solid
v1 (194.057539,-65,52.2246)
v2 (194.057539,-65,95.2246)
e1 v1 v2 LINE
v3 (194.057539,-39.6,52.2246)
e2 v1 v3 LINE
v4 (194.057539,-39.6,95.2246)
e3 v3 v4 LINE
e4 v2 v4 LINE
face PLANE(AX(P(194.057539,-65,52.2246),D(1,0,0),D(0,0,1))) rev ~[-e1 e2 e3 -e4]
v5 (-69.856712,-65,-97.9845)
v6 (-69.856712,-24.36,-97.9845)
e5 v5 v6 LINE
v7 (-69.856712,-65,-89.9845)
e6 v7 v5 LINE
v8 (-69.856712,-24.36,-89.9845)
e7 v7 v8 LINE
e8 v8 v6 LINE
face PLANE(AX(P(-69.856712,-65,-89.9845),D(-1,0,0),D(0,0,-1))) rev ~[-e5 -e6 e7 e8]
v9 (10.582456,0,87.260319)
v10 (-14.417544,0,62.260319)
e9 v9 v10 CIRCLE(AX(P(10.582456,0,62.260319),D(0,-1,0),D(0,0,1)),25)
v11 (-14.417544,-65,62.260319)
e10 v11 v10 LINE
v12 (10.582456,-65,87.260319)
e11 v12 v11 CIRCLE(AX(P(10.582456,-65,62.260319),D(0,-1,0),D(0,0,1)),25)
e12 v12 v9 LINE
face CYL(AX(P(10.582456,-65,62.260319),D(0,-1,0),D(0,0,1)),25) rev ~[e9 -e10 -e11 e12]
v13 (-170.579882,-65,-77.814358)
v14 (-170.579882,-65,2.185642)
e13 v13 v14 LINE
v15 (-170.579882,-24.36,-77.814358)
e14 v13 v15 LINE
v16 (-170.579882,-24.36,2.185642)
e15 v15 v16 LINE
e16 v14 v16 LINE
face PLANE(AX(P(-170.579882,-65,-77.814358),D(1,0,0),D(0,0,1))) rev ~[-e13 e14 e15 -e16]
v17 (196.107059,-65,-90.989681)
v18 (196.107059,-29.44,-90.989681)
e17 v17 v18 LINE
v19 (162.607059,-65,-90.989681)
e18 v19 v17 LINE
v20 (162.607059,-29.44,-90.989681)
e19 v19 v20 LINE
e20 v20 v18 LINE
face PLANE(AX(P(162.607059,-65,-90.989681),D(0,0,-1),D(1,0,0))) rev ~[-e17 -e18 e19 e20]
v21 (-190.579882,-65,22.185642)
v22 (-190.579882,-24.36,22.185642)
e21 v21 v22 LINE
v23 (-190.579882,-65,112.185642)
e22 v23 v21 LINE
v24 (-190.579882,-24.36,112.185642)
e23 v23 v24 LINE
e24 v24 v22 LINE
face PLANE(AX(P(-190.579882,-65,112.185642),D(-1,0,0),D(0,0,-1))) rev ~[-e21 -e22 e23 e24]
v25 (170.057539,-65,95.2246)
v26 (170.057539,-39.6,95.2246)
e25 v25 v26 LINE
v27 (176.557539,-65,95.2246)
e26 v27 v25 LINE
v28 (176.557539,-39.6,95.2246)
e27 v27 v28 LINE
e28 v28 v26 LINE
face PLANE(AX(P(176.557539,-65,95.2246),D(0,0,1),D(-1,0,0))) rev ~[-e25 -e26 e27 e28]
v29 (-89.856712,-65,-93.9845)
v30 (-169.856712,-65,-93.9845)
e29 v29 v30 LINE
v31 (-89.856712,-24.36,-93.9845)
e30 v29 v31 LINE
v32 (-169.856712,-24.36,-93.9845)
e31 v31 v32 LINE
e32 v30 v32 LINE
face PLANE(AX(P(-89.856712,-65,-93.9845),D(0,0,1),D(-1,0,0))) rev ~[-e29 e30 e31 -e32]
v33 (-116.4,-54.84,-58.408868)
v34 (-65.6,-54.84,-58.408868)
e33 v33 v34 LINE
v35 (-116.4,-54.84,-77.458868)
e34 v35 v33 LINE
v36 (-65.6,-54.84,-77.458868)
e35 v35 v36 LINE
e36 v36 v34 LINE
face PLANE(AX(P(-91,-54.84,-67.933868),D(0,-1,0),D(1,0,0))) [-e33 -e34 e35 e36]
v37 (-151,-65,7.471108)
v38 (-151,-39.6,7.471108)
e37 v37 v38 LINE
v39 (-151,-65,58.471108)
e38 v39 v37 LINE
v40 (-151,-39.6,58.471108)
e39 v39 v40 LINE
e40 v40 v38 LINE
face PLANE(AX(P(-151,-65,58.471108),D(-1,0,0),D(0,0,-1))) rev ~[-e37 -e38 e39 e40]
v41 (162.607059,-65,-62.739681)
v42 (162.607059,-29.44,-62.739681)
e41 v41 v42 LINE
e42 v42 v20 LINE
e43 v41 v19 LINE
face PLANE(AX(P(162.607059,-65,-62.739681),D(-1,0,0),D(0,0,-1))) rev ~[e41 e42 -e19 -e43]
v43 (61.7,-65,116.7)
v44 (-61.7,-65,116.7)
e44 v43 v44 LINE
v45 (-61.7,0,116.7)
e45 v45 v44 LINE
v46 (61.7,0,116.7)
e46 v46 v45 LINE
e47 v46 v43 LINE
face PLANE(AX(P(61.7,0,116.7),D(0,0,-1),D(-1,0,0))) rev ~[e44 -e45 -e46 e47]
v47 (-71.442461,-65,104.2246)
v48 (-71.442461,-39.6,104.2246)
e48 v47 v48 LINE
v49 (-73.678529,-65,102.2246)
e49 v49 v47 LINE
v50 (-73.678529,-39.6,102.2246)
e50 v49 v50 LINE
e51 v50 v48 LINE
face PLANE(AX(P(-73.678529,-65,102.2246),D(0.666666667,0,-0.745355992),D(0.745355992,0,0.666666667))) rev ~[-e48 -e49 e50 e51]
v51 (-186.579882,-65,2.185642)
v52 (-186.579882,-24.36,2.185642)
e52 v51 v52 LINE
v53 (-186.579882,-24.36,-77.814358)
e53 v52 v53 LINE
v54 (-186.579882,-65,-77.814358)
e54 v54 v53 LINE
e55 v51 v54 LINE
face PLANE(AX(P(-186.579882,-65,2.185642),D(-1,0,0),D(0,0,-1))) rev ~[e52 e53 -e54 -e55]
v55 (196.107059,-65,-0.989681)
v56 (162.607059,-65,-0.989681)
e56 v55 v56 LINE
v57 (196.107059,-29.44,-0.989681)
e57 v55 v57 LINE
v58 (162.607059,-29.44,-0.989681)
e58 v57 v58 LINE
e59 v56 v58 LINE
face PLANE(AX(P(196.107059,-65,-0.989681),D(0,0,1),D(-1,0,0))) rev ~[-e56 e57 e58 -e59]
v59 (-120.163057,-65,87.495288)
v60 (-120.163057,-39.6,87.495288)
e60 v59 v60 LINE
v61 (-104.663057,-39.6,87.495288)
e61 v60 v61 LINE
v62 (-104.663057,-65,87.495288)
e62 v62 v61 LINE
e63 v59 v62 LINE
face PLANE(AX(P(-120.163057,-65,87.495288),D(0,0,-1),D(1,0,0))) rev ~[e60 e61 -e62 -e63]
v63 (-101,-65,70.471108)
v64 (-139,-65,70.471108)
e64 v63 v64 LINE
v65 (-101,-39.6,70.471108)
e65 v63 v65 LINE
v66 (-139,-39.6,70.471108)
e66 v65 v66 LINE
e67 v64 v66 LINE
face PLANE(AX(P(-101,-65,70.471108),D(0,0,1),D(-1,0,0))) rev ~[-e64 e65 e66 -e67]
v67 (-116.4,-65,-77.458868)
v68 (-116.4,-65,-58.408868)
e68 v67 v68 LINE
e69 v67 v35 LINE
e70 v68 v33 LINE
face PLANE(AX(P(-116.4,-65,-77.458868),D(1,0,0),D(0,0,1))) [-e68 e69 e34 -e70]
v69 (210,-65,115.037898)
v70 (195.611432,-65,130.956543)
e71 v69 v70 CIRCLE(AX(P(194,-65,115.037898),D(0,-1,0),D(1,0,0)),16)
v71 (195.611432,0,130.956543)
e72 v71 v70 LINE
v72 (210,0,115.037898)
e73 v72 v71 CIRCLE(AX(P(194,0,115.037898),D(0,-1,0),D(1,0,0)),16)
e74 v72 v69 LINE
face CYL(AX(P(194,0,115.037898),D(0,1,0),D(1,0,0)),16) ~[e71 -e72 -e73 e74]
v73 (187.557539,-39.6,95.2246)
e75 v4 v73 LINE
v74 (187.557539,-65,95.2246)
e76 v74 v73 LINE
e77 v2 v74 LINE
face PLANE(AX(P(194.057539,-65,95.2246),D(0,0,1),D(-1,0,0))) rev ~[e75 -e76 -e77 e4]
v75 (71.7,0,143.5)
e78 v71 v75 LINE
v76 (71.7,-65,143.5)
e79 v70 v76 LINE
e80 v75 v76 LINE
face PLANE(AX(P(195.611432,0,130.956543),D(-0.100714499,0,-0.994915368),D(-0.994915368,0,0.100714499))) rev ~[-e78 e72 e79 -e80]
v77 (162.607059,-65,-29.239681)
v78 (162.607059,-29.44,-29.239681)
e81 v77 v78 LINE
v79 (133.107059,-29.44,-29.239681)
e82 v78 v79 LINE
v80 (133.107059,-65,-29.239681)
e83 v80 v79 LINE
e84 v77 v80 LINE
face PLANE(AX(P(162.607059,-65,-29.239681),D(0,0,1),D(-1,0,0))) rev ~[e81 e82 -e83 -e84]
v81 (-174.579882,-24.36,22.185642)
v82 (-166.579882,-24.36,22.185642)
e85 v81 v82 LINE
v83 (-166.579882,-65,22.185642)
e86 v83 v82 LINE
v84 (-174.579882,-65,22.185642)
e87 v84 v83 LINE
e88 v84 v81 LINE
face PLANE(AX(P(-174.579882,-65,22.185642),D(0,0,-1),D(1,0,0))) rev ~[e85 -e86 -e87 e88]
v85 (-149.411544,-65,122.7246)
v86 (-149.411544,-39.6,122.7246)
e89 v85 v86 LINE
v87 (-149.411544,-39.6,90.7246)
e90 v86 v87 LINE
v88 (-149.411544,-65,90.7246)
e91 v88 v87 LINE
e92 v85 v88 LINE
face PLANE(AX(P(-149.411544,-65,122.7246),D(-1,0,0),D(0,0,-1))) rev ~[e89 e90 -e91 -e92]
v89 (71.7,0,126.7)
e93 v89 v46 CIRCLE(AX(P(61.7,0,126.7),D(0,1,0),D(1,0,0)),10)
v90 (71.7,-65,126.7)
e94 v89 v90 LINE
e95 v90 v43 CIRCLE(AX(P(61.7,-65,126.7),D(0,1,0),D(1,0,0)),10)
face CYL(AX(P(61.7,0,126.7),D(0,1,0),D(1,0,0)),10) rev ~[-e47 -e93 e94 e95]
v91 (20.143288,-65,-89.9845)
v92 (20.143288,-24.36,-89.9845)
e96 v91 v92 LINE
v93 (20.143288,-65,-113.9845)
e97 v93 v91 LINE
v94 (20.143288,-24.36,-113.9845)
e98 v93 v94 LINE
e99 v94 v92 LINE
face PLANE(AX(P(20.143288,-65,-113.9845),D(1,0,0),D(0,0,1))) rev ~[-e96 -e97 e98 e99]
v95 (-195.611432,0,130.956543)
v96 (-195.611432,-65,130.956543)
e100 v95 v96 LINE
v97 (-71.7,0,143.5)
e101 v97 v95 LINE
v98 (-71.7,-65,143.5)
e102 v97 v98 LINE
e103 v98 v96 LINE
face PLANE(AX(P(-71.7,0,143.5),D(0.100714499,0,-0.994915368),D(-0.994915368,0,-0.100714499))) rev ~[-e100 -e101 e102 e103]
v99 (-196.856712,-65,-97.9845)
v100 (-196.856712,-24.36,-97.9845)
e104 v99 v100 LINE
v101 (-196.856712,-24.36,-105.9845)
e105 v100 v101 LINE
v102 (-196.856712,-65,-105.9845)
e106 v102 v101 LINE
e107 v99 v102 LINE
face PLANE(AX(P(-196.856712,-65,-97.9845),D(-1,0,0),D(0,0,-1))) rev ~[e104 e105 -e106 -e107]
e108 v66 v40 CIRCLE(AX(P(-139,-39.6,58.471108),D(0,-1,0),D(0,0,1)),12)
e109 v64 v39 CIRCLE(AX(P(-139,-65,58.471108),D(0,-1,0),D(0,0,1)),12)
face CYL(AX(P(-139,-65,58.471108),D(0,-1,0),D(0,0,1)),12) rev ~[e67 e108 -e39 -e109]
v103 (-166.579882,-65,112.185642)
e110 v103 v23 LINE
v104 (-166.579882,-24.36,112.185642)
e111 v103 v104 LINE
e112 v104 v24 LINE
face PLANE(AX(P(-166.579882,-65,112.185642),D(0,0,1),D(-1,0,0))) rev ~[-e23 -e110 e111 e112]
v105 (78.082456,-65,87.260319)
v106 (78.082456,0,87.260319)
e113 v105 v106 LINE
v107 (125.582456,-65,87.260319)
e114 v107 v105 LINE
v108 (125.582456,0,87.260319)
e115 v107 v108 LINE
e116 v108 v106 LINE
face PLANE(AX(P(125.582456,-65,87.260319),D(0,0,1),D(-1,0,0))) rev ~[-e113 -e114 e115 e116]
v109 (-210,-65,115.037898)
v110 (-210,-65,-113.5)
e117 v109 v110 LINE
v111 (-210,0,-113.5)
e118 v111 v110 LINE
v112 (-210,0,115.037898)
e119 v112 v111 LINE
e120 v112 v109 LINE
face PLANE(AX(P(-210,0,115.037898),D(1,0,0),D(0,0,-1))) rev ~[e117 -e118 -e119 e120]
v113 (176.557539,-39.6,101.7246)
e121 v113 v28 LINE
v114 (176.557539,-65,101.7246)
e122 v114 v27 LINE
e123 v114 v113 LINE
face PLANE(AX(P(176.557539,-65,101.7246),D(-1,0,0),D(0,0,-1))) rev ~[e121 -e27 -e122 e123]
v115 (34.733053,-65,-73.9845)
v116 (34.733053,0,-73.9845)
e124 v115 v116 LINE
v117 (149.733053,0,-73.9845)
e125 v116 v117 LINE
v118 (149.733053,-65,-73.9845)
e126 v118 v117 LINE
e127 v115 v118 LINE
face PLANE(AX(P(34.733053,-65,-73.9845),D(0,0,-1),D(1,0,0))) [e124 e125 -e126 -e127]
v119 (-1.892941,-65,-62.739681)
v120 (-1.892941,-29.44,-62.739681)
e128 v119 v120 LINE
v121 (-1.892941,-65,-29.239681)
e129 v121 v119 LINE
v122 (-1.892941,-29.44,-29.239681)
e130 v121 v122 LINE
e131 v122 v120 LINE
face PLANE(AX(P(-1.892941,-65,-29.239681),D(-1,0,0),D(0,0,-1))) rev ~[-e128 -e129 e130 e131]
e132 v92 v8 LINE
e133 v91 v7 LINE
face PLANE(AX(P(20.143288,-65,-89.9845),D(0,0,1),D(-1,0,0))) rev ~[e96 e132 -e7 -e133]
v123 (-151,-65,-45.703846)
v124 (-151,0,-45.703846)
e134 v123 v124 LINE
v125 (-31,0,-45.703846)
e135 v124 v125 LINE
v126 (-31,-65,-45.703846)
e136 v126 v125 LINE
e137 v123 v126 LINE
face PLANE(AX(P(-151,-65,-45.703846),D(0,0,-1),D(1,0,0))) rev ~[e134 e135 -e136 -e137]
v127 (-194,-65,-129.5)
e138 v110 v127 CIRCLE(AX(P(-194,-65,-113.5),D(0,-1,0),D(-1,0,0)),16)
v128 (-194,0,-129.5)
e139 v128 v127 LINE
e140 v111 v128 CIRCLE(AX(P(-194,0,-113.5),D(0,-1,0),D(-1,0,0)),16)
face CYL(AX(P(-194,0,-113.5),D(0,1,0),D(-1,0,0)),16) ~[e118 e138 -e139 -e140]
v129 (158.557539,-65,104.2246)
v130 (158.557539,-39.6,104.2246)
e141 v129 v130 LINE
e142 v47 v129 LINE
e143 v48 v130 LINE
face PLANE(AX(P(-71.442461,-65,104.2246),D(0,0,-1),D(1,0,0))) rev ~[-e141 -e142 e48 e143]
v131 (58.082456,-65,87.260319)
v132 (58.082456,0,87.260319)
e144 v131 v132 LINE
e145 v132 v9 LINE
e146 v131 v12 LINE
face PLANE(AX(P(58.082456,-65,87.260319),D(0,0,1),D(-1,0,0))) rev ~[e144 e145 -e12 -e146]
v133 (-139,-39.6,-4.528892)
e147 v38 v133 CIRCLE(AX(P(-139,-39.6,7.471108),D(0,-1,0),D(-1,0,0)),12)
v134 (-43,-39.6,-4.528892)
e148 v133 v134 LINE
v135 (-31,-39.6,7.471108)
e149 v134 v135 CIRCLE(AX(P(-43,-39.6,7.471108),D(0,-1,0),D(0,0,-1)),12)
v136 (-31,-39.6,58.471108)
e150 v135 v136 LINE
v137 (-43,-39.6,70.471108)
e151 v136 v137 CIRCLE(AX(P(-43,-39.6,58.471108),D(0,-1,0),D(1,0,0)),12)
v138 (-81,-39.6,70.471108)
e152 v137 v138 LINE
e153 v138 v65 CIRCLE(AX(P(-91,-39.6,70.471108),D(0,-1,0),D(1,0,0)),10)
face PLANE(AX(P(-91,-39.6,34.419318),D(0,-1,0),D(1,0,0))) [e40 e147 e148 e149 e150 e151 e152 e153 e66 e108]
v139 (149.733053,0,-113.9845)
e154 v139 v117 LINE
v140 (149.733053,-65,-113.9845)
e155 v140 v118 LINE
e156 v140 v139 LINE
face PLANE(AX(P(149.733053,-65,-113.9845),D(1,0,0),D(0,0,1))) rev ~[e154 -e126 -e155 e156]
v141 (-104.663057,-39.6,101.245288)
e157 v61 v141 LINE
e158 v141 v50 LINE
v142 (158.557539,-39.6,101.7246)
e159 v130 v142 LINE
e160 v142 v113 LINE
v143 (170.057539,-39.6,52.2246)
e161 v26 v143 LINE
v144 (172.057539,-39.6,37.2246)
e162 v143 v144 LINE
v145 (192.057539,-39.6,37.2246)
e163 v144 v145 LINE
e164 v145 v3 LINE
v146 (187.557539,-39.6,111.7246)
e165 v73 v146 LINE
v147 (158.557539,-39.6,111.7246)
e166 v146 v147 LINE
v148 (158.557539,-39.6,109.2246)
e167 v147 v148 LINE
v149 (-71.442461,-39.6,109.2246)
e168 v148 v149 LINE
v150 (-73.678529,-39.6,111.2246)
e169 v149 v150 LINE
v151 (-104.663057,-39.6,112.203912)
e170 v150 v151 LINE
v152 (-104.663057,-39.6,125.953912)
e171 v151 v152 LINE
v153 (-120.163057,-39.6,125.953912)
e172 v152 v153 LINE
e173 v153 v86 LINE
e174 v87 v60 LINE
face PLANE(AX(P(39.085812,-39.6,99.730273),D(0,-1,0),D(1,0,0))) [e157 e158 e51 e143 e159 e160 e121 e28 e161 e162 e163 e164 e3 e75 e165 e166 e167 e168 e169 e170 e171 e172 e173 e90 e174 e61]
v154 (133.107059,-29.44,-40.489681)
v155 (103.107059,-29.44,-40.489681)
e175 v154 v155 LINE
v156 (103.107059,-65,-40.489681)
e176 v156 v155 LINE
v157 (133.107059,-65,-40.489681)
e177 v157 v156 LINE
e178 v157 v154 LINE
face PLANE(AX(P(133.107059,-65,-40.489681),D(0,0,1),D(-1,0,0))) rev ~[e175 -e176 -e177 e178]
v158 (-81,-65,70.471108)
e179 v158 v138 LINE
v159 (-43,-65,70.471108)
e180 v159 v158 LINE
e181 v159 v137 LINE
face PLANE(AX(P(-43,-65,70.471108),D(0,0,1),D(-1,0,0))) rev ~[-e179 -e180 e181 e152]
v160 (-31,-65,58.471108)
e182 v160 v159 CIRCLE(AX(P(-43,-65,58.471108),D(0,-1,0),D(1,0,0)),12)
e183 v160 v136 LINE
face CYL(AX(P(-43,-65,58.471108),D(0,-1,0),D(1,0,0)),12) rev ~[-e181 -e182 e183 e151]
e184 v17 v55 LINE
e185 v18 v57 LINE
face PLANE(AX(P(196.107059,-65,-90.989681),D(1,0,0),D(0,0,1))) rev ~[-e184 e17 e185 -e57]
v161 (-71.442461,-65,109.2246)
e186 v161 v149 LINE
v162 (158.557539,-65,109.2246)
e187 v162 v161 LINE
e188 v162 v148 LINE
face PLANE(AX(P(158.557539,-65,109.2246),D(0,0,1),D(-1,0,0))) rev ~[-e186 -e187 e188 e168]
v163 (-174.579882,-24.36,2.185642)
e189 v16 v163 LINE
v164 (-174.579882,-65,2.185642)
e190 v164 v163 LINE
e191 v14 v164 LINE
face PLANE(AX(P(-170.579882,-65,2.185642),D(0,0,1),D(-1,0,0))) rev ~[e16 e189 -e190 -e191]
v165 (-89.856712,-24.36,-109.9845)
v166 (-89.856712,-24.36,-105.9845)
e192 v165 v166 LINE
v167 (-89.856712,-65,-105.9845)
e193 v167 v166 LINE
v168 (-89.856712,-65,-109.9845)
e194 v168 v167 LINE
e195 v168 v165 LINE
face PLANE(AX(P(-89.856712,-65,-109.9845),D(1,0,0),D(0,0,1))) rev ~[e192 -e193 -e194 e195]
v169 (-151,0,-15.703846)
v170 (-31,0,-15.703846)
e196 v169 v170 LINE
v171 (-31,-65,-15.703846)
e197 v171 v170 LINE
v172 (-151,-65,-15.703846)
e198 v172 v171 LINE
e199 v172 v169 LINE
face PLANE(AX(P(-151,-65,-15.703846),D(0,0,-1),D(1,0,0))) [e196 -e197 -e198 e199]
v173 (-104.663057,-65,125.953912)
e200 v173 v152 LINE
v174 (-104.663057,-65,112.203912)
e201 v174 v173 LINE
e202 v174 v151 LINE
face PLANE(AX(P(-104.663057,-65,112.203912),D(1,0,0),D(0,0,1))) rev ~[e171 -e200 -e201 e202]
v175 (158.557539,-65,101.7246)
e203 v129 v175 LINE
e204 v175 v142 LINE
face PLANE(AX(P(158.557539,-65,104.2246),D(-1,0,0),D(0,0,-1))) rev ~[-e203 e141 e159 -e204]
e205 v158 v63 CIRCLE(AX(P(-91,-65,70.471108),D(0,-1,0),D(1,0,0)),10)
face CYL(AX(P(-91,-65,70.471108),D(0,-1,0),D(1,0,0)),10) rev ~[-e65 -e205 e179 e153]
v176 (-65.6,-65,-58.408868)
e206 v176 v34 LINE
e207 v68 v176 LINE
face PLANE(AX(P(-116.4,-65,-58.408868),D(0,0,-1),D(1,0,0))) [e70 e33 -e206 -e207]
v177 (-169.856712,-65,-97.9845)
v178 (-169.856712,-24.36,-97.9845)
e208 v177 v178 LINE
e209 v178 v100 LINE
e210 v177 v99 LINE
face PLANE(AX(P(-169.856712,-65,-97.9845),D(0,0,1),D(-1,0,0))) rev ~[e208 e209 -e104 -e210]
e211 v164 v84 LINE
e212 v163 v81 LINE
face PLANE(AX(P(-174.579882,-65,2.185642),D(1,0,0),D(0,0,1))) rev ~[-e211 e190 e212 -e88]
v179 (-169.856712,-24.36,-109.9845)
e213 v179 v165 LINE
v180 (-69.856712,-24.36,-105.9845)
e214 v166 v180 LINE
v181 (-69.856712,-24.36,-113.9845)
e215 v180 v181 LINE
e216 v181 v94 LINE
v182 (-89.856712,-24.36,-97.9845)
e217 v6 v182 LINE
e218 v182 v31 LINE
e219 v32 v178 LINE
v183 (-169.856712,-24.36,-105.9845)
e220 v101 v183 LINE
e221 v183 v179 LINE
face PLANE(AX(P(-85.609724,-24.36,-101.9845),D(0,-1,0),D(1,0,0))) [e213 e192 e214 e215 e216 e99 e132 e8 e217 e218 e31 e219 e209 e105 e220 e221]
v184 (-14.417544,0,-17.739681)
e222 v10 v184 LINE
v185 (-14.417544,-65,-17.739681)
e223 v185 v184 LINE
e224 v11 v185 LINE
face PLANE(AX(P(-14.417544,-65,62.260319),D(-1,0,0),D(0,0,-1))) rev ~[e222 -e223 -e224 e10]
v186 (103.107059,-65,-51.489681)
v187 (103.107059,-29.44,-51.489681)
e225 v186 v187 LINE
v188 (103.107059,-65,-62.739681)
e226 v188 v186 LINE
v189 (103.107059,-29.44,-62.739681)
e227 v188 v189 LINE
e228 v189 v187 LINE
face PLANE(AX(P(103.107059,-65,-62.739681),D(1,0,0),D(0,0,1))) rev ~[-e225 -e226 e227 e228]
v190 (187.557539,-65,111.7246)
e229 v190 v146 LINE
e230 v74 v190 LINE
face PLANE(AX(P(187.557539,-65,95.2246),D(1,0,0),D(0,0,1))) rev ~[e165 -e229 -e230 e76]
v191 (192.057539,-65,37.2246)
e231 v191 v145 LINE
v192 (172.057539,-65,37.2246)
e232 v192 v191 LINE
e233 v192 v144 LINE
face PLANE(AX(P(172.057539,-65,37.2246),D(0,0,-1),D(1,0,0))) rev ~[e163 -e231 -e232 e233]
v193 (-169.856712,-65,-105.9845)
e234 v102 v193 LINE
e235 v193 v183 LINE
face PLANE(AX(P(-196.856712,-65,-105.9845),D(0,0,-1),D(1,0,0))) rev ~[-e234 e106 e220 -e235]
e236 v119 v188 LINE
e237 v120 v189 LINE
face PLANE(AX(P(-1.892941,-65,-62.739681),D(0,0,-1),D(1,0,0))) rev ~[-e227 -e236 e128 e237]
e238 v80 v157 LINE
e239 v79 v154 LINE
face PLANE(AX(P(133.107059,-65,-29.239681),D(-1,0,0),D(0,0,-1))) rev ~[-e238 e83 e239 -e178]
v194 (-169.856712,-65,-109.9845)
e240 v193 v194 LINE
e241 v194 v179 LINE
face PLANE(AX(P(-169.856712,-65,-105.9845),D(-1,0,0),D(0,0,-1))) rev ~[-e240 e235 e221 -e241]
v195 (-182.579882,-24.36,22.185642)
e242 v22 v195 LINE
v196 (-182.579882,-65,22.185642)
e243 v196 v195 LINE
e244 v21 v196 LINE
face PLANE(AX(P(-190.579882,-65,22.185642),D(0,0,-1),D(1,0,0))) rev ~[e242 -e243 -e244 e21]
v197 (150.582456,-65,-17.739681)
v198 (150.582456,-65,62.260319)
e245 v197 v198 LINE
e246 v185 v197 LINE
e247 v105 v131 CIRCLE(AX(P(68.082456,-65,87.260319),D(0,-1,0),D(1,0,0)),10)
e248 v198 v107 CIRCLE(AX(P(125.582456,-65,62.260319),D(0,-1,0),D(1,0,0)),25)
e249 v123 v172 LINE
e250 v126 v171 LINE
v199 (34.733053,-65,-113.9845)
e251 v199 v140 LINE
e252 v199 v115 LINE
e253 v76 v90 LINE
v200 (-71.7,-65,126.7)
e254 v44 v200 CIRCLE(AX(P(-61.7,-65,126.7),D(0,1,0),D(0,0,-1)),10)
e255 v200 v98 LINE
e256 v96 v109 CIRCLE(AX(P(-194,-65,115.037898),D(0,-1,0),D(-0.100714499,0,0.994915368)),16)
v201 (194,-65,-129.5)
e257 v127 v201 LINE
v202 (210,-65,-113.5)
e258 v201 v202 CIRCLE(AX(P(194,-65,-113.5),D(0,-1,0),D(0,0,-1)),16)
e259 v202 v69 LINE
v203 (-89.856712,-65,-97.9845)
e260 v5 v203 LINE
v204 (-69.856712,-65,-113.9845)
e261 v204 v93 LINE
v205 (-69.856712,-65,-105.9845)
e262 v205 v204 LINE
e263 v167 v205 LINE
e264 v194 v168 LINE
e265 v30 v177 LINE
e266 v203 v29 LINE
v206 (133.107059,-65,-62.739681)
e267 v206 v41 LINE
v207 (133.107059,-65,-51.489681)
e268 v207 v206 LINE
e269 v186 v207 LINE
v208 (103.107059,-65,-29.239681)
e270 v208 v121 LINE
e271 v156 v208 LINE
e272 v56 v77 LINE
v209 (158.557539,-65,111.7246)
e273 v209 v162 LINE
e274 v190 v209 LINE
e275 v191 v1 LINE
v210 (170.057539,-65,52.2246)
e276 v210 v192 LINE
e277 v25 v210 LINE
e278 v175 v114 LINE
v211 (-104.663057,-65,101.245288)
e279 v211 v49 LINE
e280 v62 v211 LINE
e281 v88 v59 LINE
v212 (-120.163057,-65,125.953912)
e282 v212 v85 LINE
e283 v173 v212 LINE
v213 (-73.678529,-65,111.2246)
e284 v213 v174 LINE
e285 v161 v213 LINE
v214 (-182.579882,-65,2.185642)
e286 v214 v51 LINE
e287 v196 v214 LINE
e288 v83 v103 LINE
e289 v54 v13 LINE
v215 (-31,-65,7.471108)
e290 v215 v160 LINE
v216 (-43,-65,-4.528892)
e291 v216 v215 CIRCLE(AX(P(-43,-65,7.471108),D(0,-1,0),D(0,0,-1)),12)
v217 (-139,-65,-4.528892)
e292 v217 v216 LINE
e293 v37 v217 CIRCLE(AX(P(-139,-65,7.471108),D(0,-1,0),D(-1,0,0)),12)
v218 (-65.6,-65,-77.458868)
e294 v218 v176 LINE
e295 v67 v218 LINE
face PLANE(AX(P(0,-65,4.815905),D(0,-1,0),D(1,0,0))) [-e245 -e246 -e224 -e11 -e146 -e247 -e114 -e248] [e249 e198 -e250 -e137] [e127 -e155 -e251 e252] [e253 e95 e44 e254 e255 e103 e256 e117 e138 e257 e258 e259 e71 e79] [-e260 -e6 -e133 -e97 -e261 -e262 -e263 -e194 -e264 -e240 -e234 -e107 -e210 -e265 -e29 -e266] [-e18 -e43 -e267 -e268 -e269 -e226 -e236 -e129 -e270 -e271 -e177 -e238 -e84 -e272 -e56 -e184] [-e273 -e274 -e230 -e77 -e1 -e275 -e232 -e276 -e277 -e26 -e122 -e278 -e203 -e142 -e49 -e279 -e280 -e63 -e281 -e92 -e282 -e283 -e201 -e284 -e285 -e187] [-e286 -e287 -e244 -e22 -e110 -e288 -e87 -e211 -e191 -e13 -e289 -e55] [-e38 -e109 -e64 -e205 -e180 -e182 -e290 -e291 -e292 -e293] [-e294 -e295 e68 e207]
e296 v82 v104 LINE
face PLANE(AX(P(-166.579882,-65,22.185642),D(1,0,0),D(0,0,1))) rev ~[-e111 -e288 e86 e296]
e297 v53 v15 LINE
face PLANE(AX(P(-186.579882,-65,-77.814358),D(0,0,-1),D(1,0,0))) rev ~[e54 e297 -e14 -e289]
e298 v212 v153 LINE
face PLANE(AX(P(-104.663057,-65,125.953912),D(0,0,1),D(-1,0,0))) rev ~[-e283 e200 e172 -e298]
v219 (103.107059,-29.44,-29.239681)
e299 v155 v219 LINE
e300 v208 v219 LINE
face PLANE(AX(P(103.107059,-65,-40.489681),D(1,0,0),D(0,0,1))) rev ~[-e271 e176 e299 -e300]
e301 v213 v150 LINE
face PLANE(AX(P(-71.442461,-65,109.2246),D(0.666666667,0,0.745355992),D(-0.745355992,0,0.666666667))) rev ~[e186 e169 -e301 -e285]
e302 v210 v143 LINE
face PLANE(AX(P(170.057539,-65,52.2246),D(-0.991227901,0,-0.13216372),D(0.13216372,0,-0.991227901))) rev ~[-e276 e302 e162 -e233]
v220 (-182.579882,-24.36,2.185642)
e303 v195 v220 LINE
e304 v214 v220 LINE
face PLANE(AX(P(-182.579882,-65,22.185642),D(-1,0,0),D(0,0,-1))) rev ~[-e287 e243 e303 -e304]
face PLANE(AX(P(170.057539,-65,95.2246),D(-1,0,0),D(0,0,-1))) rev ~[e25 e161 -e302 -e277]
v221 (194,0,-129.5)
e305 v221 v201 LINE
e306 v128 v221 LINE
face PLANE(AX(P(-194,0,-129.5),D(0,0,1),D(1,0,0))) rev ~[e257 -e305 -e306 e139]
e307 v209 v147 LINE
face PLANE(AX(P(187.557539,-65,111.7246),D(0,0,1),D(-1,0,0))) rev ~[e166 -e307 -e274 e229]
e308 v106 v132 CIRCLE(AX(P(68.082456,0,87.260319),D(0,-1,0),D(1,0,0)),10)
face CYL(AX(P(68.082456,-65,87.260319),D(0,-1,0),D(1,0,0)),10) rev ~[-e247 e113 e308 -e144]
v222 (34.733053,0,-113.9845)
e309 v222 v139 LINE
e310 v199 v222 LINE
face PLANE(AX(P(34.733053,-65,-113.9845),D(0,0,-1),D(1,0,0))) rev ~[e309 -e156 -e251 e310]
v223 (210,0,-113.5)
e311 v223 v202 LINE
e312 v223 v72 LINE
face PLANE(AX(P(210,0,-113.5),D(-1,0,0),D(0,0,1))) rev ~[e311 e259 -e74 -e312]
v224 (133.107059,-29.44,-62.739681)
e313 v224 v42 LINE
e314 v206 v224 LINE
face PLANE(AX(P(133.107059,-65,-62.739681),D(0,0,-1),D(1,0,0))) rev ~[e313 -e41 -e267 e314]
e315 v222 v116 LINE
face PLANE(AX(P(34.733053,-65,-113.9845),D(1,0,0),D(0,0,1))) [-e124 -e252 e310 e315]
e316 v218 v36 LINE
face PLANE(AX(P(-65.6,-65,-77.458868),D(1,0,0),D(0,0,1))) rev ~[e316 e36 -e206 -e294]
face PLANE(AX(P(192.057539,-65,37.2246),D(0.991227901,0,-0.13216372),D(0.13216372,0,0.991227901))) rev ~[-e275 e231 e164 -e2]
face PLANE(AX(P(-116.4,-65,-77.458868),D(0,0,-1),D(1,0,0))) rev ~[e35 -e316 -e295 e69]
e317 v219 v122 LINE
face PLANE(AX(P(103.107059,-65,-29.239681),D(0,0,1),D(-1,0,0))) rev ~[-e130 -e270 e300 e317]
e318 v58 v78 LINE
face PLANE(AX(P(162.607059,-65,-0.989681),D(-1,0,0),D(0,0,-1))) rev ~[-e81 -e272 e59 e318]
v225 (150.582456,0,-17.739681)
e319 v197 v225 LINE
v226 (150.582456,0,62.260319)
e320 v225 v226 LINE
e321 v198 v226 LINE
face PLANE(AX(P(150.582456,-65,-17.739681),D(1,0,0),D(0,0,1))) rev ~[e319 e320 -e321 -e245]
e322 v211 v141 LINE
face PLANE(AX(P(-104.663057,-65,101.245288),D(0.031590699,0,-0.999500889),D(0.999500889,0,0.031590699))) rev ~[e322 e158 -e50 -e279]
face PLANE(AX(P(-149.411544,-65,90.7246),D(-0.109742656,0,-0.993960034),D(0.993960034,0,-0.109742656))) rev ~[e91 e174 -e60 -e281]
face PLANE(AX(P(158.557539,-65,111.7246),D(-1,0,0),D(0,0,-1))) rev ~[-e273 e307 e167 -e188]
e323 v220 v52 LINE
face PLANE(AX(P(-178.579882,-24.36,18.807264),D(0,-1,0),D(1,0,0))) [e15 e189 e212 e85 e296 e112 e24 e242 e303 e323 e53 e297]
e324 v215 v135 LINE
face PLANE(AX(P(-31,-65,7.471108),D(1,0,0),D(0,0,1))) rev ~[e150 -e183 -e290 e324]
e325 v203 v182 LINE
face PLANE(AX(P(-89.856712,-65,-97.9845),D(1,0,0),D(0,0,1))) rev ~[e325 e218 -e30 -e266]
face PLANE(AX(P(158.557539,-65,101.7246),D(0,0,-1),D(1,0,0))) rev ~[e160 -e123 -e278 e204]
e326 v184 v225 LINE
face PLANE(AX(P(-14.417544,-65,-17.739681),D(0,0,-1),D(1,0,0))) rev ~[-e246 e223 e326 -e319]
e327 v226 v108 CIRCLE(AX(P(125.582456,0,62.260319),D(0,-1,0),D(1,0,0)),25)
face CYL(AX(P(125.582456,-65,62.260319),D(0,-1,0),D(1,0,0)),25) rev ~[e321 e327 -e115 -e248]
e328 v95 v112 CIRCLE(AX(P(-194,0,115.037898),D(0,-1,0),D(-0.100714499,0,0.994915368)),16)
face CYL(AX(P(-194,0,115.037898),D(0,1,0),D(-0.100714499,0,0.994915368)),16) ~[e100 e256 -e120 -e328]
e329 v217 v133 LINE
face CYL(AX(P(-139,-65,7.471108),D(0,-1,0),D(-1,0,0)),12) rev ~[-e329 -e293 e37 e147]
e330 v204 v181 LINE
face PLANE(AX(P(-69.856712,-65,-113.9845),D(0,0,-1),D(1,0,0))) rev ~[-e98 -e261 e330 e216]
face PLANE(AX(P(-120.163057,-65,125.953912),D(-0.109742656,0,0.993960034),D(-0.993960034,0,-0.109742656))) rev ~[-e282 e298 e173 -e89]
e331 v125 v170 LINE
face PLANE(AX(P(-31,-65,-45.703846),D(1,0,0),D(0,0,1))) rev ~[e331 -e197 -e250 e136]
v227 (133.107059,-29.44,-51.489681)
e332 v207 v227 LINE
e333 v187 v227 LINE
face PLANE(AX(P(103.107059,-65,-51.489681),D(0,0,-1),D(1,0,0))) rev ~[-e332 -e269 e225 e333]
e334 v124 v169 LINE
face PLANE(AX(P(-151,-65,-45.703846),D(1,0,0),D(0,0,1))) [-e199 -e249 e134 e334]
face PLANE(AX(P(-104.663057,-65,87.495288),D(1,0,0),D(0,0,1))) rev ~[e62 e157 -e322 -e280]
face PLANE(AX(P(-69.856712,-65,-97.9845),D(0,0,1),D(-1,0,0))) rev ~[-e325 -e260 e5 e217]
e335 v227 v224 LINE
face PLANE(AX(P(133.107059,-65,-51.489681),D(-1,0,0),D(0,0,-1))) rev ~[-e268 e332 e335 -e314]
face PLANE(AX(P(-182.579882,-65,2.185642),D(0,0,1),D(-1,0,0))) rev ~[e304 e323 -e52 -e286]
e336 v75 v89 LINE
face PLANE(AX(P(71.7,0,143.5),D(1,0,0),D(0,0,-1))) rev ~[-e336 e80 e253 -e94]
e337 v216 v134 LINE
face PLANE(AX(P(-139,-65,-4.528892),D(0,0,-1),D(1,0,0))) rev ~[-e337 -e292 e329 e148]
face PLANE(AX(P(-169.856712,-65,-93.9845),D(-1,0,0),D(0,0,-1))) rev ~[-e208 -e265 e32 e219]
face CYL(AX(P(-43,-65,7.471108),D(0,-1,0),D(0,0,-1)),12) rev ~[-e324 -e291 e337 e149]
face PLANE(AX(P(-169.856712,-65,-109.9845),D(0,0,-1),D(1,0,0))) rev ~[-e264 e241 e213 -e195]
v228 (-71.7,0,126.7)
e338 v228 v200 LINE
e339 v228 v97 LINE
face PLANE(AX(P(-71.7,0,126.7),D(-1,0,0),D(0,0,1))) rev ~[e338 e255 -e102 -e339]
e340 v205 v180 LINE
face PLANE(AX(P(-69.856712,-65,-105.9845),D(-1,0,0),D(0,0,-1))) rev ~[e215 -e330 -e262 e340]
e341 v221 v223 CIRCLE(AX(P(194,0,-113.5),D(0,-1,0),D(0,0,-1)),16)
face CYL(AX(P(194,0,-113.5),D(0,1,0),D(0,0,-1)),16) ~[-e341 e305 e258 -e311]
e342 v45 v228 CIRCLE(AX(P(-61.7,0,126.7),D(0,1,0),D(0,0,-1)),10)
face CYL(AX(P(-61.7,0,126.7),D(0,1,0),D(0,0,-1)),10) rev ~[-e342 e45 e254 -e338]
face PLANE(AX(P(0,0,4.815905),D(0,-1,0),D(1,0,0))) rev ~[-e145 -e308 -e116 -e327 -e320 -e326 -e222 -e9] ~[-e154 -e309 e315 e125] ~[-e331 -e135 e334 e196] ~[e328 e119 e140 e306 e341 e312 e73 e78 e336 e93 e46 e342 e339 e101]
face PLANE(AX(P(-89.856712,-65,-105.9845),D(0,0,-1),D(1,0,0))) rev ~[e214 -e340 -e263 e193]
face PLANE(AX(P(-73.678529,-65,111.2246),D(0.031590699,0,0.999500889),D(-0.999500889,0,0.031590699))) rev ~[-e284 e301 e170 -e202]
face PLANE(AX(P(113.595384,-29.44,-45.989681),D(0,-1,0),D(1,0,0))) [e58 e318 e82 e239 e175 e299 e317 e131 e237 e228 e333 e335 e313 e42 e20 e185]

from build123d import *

# Parameters (mm, degrees)
F1_DEPTH  = 65
F11_DEPTH = 65.001
F12_DEPTH = 25.4
F13_DEPTH = 35.56
F9_W      = 120
F9_H      = 30
F8_W      = 115
F8_H      = 40
F14_DEPTH = 65.001
F15_DEPTH = 25.4
F16_DEPTH = 40.64
F10_W     = 50.8
F10_H     = 19.05
F17_DEPTH = 10.16


# Not quite as in the source:
# - a length typed as a fraction of an inch, garbled in the dataset ("3 / 203.2 mm" for 3/8 in), is restored


with BuildPart() as f1:
    # F0 (on Front) → F1 (new body)
    with BuildSketch(Plane.XZ):
        with BuildLine():
            Line((-194, -129.5), (0, -129.5))
            Line((0, -129.5), (194, -129.5))
            ThreePointArc((194, -129.5), (205.313708499, -124.813708499), (210, -113.5))
            Line((210, -113.5), (210, 115.0378975104))
            ThreePointArc((210, 115.0378975104), (205.8697706725, 125.76676251), (195.6114319773, 130.9565434007))
            Line((195.6114319773, 130.9565434007), (71.7, 143.5))
            Line((71.7, 143.5), (71.7, 126.7))
            ThreePointArc((71.7, 126.7), (68.7710678119, 119.6289321881), (61.7, 116.7))
            Line((61.7, 116.7), (0, 116.7))
            Line((0, 116.7), (-61.7, 116.7))
            ThreePointArc((-61.7, 116.7), (-68.7710678119, 119.6289321881), (-71.7, 126.7))
            Line((-71.7, 126.7), (-71.7, 143.5))
            Line((-71.7, 143.5), (-195.6114319773, 130.9565434007))
            ThreePointArc((-195.6114319773, 130.9565434007), (-205.8697706725, 125.76676251), (-210, 115.0378975104))
            Line((-210, 115.0378975104), (-210, -113.5))
            ThreePointArc((-210, -113.5), (-205.313708499, -124.813708499), (-194, -129.5))
        make_face()
    extrude(amount=F1_DEPTH)

    # F10 (on face) → F11 (cut, through all)
    with BuildSketch(Plane.XZ.offset(65)):
        with BuildLine():
            Line((-14.4175440073, -17.7396814525), (55.0347959064, -17.7396814525))
            Line((55.0347959064, -17.7396814525), (150.5824559927, -17.7396814525))
            Line((150.5824559927, -17.7396814525), (150.5824559927, 62.2603185475))
            ThreePointArc((150.5824559927, 62.2603185475), (143.2601255224, 79.9379880772), (125.5824559927, 87.2603185475))
            Line((125.5824559927, 87.2603185475), (78.0824559927, 87.2603185475))
            ThreePointArc((78.0824559927, 87.2603185475), (68.0824559927, 97.2603185475), (58.0824559927, 87.2603185475))
            Line((58.0824559927, 87.2603185475), (10.5824559927, 87.2603185475))
            ThreePointArc((10.5824559927, 87.2603185475), (-7.095213537, 79.9379880772), (-14.4175440073, 62.2603185475))
            Line((-14.4175440073, 62.2603185475), (-14.4175440073, -17.7396814525))
        make_face()
    extrude(amount=-F11_DEPTH, mode=Mode.SUBTRACT)

    # F3 (on face) → F12 (cut)
    with BuildSketch(Plane.XZ.offset(65)):
        with BuildLine():
            ThreePointArc((-151, 7.4711079597), (-147.4852813742, -1.0141734145), (-139, -4.5288920403))
            Line((-139, -4.5288920403), (-101.0147116184, -4.5288920403))
            Line((-101.0147116184, -4.5288920403), (-43, -4.5288920403))
            ThreePointArc((-43, -4.5288920403), (-34.5147186258, -1.0141734145), (-31, 7.4711079597))
            Line((-31, 7.4711079597), (-31, 58.4711079597))
            ThreePointArc((-31, 58.4711079597), (-34.5147186258, 66.956389334), (-43, 70.4711079597))
            Line((-43, 70.4711079597), (-81, 70.4711079597))
            ThreePointArc((-81, 70.4711079597), (-91, 80.4711079597), (-101, 70.4711079597))
            Line((-101, 70.4711079597), (-139, 70.4711079597))
            ThreePointArc((-139, 70.4711079597), (-147.4852813742, 66.956389334), (-151, 58.4711079597))
            Line((-151, 58.4711079597), (-151, 7.4711079597))
        make_face()
    extrude(amount=-F12_DEPTH, mode=Mode.SUBTRACT)

    # F4 (on face) → F13 (cut)
    with BuildSketch(Plane.XZ.offset(65)):
        Polygon((162.6070588827, -90.9896814525), (196.1070588827, -90.9896814525), (196.1070588827, -45.9896814525), (196.1070588827, -0.9896814525), (162.6070588827, -0.9896814525), (162.6070588827, -29.2396814525), (133.1070588827, -29.2396814525), (133.1070588827, -40.4896814525), (103.1070588827, -40.4896814525), (103.1070588827, -29.2396814525), (-1.8929411173, -29.2396814525), (-1.8929411173, -45.9896814525), (-1.8929411173, -62.7396814525), (103.1070588827, -62.7396814525), (103.1070588827, -51.4896814525), (133.1070588827, -51.4896814525), (133.1070588827, -62.7396814525), (162.6070588827, -62.7396814525), align=None)
    extrude(amount=-F13_DEPTH, mode=Mode.SUBTRACT)

    # F9 (on face) + F8 (on face) → F14 (cut, through all)
    with BuildSketch(Plane.XZ.offset(65)):
        with Locations((-91, -30.7038457692)):
            Rectangle(F9_W, F9_H)
    with BuildSketch(Plane.XZ.offset(65)):
        with Locations((92.2330532188, -93.9844995737)):
            Rectangle(F8_W, F8_H)
    extrude(amount=-F14_DEPTH, mode=Mode.SUBTRACT)

    # F7 (on face) → F15 (cut)
    with BuildSketch(Plane.XZ.offset(65)):
        Polygon((-149.4115442038, 122.7246001363), (-149.4115442038, 106.7246001363), (-149.4115442038, 90.7246001363), (-120.1630565758, 87.4952884788), (-104.6630565758, 87.4952884788), (-104.6630565758, 101.2452884788), (-73.6785290068, 102.2246001363), (-71.4424610293, 104.2246001363), (158.5575389707, 104.2246001363), (158.5575389707, 101.7246001363), (176.5575389707, 101.7246001363), (176.5575389707, 95.2246001363), (170.0575389707, 95.2246001363), (170.0575389707, 52.2246001363), (172.0575389707, 37.2246001363), (182.0575389707, 37.2246001363), (192.0575389707, 37.2246001363), (194.0575389707, 52.2246001363), (194.0575389707, 95.2246001363), (187.5575389707, 95.2246001363), (187.5575389707, 111.7246001363), (158.5575389707, 111.7246001363), (158.5575389707, 109.2246001363), (-71.4424610293, 109.2246001363), (-73.6785290068, 111.2246001363), (-104.6630565758, 112.2039117938), (-104.6630565758, 125.9539117938), (-120.1630565758, 125.9539117938), align=None)
    extrude(amount=-F15_DEPTH, mode=Mode.SUBTRACT)

    # F7 (on face) + F5 (on face) → F16 (cut)
    with BuildSketch(Plane.XZ.offset(65)):
        Polygon((-89.8567122221, -93.9844995737), (-169.8567122221, -93.9844995737), (-169.8567122221, -97.9844995737), (-196.8567122221, -97.9844995737), (-196.8567122221, -101.9844995737), (-196.8567122221, -105.9844995737), (-169.8567122221, -105.9844995737), (-169.8567122221, -109.9844995737), (-89.8567122221, -109.9844995737), (-89.8567122221, -105.9844995737), (-69.8567122221, -105.9844995737), (-69.8567122221, -113.9844995737), (20.1432877779, -113.9844995737), (20.1432877779, -101.9844995737), (20.1432877779, -89.9844995737), (-69.8567122221, -89.9844995737), (-69.8567122221, -97.9844995737), (-89.8567122221, -97.9844995737), align=None)
    with BuildSketch(Plane.XZ.offset(65)):
        Polygon((-186.5798817873, 2.1856421232), (-186.5798817873, -77.8143578768), (-178.5798817873, -77.8143578768), (-170.5798817873, -77.8143578768), (-170.5798817873, 2.1856421232), (-174.5798817873, 2.1856421232), (-174.5798817873, 22.1856421232), (-166.5798817873, 22.1856421232), (-166.5798817873, 112.1856421232), (-178.5798817873, 112.1856421232), (-190.5798817873, 112.1856421232), (-190.5798817873, 22.1856421232), (-182.5798817873, 22.1856421232), (-182.5798817873, 2.1856421232), align=None)
    extrude(amount=-F16_DEPTH, mode=Mode.SUBTRACT)

    # F10 (on face) → F17 (cut)
    with BuildSketch(Plane.XZ.offset(65)):
        with Locations((-91, -67.9338675678)):
            Rectangle(F10_W, F10_H)
    extrude(amount=-F17_DEPTH, mode=Mode.SUBTRACT)


solid = f1.part
